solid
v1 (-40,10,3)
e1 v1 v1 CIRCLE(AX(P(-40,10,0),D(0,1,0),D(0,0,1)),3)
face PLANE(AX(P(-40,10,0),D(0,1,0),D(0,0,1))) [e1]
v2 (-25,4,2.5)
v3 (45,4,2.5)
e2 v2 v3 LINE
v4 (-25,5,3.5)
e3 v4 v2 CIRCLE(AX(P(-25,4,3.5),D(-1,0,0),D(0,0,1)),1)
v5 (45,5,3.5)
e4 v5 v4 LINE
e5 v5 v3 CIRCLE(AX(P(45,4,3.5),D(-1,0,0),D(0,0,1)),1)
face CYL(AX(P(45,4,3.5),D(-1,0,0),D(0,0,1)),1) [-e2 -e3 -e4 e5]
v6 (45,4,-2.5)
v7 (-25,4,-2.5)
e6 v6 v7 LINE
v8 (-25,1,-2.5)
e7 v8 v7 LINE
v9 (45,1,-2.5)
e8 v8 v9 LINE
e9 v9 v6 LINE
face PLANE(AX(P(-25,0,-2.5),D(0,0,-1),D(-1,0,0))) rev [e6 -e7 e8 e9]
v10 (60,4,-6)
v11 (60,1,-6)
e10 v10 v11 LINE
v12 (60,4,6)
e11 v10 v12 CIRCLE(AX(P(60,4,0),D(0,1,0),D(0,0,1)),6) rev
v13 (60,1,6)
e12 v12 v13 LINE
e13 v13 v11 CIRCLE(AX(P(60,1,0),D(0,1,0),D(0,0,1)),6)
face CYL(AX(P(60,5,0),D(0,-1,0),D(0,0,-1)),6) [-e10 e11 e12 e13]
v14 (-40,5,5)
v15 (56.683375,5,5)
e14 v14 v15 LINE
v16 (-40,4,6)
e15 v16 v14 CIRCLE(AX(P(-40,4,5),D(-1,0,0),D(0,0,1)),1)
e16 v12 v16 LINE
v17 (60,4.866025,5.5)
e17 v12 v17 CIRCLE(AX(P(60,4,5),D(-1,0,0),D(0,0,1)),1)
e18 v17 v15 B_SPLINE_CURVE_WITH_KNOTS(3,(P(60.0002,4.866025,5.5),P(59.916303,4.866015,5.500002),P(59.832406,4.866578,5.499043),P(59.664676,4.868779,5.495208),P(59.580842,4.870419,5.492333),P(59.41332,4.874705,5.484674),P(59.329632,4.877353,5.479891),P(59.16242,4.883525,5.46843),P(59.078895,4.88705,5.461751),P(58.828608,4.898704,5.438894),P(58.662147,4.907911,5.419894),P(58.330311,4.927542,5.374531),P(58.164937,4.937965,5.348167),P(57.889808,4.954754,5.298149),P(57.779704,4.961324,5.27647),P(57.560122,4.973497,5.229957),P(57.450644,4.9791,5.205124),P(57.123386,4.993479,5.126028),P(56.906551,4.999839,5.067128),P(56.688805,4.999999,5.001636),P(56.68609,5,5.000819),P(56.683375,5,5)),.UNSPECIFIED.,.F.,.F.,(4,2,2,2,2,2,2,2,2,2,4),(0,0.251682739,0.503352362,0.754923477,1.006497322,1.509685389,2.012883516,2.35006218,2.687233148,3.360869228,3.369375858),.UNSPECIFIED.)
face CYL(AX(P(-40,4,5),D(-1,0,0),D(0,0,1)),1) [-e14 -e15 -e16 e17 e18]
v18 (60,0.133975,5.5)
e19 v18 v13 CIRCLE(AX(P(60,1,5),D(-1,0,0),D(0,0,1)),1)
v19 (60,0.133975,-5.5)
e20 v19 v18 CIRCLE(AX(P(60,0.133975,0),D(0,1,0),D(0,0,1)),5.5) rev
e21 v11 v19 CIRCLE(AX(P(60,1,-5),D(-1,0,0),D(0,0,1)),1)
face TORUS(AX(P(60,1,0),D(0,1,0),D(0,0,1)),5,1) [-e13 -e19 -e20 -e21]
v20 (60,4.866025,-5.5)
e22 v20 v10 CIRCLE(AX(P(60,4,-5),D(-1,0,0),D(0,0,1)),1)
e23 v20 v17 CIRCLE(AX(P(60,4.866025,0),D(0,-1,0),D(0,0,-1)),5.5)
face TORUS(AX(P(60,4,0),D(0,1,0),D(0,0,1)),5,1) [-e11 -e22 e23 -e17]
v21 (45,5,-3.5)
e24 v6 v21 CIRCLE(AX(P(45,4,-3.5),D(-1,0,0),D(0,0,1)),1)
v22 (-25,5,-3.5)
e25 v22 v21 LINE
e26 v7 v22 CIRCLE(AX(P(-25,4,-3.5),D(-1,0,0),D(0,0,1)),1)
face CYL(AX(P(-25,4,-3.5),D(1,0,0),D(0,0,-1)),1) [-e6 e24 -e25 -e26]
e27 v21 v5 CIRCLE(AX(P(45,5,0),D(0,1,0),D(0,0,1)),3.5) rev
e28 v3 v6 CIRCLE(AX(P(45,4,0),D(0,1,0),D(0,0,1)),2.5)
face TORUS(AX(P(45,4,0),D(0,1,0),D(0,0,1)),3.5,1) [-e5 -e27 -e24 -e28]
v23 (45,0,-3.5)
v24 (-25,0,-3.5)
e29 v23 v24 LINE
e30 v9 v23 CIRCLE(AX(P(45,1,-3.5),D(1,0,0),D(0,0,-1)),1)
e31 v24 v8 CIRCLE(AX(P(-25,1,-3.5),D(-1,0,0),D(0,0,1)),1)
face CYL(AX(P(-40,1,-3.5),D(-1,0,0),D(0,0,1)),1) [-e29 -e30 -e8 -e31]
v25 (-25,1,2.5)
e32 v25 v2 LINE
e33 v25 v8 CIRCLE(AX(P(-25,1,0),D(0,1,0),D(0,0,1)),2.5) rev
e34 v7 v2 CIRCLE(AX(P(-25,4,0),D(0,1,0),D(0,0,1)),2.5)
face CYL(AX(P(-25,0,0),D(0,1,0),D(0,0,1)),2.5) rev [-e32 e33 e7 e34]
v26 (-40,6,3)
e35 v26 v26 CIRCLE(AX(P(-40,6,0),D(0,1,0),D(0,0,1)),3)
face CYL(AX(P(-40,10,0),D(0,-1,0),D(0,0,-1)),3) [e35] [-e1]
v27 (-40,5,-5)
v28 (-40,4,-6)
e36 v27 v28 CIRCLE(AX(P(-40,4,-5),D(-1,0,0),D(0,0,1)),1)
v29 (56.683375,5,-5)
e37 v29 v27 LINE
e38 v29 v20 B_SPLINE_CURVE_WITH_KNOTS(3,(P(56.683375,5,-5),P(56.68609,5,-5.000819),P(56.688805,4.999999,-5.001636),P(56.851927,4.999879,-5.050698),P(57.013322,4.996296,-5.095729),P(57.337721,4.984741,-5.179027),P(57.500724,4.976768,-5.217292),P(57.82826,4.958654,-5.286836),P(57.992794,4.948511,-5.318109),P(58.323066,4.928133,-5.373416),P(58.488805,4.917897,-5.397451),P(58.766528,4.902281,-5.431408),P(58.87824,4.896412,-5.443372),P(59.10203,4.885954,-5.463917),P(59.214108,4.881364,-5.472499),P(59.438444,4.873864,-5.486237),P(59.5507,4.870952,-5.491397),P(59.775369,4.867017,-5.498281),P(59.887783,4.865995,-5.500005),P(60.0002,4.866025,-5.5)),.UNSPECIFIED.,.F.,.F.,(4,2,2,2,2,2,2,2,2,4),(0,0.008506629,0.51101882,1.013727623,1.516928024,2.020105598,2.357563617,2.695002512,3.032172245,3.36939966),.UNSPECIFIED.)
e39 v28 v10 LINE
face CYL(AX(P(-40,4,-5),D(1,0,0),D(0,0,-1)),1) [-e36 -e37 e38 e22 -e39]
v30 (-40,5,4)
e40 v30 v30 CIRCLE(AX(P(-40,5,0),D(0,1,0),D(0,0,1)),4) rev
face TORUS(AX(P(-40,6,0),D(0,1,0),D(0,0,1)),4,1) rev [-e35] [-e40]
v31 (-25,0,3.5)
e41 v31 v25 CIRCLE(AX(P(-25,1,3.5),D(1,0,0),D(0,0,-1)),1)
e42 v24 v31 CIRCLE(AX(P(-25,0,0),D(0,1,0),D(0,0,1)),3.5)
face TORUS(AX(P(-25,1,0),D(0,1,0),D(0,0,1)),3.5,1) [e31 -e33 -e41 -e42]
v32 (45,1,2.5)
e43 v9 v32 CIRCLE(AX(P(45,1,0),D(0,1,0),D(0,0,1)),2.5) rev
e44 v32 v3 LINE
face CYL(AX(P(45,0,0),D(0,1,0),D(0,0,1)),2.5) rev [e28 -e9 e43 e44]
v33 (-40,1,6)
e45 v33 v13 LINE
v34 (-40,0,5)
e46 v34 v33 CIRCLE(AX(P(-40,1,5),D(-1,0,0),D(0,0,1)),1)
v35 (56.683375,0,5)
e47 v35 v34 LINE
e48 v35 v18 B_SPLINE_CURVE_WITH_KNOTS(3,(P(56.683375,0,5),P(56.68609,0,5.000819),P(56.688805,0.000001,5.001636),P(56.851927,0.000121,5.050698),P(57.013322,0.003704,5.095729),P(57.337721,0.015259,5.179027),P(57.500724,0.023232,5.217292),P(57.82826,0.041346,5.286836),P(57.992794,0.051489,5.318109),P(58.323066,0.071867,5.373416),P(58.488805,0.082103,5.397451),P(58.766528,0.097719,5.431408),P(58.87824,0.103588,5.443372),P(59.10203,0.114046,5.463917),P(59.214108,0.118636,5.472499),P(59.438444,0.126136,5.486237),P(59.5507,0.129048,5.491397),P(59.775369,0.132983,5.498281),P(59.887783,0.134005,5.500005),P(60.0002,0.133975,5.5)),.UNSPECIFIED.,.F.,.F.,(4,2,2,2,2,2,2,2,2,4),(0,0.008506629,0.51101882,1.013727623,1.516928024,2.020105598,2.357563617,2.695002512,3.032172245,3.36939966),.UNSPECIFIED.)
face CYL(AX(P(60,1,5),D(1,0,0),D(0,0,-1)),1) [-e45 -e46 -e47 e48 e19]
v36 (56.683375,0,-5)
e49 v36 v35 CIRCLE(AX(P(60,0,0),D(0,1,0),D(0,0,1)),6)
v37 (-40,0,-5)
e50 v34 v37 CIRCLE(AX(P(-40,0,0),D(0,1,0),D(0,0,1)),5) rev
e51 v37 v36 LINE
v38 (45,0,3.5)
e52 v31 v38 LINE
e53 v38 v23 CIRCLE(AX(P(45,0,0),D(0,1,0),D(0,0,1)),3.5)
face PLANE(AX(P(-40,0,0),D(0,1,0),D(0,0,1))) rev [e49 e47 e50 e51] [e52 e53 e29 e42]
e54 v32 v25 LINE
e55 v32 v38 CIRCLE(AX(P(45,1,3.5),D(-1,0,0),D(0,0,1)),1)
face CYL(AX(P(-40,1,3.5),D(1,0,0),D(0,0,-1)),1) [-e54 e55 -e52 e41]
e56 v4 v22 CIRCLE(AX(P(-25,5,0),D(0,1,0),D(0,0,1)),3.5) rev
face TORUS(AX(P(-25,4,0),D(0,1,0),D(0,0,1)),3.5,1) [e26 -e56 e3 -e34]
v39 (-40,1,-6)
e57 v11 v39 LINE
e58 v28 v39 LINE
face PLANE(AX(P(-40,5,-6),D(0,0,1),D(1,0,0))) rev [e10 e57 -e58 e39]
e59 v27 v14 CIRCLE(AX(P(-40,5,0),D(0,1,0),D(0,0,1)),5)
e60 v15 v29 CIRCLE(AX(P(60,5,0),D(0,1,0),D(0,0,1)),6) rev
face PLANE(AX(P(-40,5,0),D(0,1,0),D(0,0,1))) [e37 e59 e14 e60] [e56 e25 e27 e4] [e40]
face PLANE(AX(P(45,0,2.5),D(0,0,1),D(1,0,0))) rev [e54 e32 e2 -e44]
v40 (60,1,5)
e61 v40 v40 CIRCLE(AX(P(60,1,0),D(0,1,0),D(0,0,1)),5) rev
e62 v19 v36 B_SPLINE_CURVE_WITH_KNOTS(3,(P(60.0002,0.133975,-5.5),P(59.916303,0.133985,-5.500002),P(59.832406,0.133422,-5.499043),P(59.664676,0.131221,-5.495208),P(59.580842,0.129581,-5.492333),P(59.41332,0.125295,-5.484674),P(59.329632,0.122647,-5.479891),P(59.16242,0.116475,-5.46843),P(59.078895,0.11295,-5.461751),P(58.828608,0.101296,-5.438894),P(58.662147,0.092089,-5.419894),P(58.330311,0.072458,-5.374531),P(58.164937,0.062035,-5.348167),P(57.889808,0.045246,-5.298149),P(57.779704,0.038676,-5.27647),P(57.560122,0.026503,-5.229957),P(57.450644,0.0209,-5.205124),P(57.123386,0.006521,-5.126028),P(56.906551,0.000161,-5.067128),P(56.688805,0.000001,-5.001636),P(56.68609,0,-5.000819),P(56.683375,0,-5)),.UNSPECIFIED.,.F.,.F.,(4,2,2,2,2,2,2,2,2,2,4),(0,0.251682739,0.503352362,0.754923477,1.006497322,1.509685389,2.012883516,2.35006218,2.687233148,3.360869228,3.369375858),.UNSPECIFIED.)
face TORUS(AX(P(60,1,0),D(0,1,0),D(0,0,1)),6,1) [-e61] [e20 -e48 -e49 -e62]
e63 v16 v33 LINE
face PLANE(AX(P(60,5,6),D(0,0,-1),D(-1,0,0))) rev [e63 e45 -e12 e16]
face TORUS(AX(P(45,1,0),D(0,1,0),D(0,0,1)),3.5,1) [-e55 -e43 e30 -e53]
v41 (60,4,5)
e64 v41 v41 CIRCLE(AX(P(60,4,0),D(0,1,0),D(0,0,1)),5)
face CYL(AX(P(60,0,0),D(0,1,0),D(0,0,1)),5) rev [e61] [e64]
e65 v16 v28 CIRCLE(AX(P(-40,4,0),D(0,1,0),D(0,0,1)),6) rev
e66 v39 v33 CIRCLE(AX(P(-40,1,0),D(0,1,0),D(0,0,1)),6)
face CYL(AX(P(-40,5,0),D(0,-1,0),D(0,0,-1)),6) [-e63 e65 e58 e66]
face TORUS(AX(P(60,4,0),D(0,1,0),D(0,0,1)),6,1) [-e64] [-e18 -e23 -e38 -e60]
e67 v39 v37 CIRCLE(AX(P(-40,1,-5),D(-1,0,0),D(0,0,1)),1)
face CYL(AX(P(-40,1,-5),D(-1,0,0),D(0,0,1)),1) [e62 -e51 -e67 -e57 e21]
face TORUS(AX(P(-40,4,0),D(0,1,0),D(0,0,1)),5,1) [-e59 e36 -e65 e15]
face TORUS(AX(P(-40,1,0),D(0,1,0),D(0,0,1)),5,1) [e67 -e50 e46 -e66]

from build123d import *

# Parameters (mm, degrees)
SKETCH_1_R          = 6
EXTRUDE_1_DEPTH     = 5
EXTRUDE_1_2_DEPTH   = 5
SKETCH_3_W          = 100
SKETCH_3_H          = 12
EXTRUDE_3_DEPTH     = 5
SKETCH_5_R          = 5
CUT_EXTRUDE_2_DEPTH = 67.460514593
SKETCH_6_R          = 2.5
CUT_EXTRUDE_3_DEPTH = 67.460514593
SKETCH_7_W          = 70
SKETCH_7_H          = 5
CUT_EXTRUDE_4_DEPTH = 67.460514593
SKETCH_4_R          = 3
EXTRUDE_4_DEPTH     = 5
FILLET_1_R          = 1
FILLET_2_R          = 1


with BuildPart() as part:
    # 草图1 → 凸台-拉伸1 (new body)
    with BuildSketch(Plane(origin=(0, 0, 0), x_dir=(1, 0, 0), z_dir=(0, 1, 0))):
        with Locations(Location((-40, 0, 0), (0, 0, 270))):
            Circle(SKETCH_1_R)
    extrude(amount=EXTRUDE_1_DEPTH)



with BuildPart() as body_2:
    # 草图1 → Extrude 1 2 (new body)
    with BuildSketch(Plane(origin=(0, 0, 0), x_dir=(1, 0, 0), z_dir=(0, 1, 0))):
        with Locations(Location((60, 0, 0), (0, 0, 270))):
            Circle(SKETCH_1_R)
    extrude(amount=EXTRUDE_1_2_DEPTH)


with BuildPart() as part_1:
    add(part.part)

    add(body_2.part)  # 凸台-拉伸3 merges body 2
    # 草图3 → 凸台-拉伸3 (add)
    with BuildSketch(Plane(origin=(0, 0, 0), x_dir=(1, 0, 0), z_dir=(0, 1, 0))):
        with Locations((10, 0)):
            Rectangle(SKETCH_3_W, SKETCH_3_H)
    extrude(amount=EXTRUDE_3_DEPTH)

    # 草图5 → 切除-拉伸2 (cut, through all)
    with BuildSketch(Plane(origin=(0, 5, 0), x_dir=(1, 0, 0), z_dir=(0, 1, 0))):
        with Locations(Location((60, 0, 0), (0, 0, 270))):
            Circle(SKETCH_5_R)
    extrude(amount=-CUT_EXTRUDE_2_DEPTH, mode=Mode.SUBTRACT)

    # 草图6 → 切除-拉伸3 (cut, through all)
    with BuildSketch(Plane(origin=(0, 5, 0), x_dir=(1, 0, 0), z_dir=(0, 1, 0))):
        with Locations(Location((-25, 0, 0), (0, 0, 270))):
            Circle(SKETCH_6_R)
        with Locations(Location((45, 0, 0), (0, 0, 270))):
            Circle(SKETCH_6_R)
    extrude(amount=-CUT_EXTRUDE_3_DEPTH, mode=Mode.SUBTRACT)

    # 草图7 → 切除-拉伸4 (cut, through all)
    with BuildSketch(Plane(origin=(0, 5, 0), x_dir=(1, 0, 0), z_dir=(0, 1, 0))):
        with Locations((10, 0)):
            Rectangle(SKETCH_7_W, SKETCH_7_H)
    extrude(amount=-CUT_EXTRUDE_4_DEPTH, mode=Mode.SUBTRACT)

    # 草图4 → 凸台-拉伸4 (add)
    with BuildSketch(Plane(origin=(0, 5, 0), x_dir=(1, 0, 0), z_dir=(0, 1, 0))):
        with Locations(Location((-40, 0, 0), (0, 0, 270))):
            Circle(SKETCH_4_R)
    extrude(amount=EXTRUDE_4_DEPTH)

    # 圆角1
    fillet_1_edges = [part_1.edges().sort_by_distance(p)[0] for p in [
        (-40, 5, -3),
    ]]
    fillet(fillet_1_edges, radius=FILLET_1_R)

    # 圆角2
    # the kernel refuses this fillet: 1 mm, written as the material it takes off along each edge
    with BuildSketch(Plane(origin=(-40, 5, 0), x_dir=(0, 0, -1), z_dir=(1, 0, 0))) as fillet_2_piece_1:
        with BuildLine():
            CenterArc((6 - FILLET_2_R, -FILLET_2_R), FILLET_2_R, 0, 90)
            Line((6, -FILLET_2_R), (6, 0))
            Line((6, 0), (6 - FILLET_2_R, 0))
        make_face()
    revolve(axis=Axis((-40, 5, 0), (0, 1, 0)), revolution_arc=180, mode=Mode.SUBTRACT)
    with BuildSketch(Plane(origin=(-40, 0, -6), x_dir=(0, 1, 0), z_dir=(1, 0, 0)), Plane(origin=(-40, 5, -6), x_dir=(0, 0, 1), z_dir=(1, 0, 0)), Plane(origin=(60, 0, 6), x_dir=(0, 1, 0), z_dir=(-1, 0, 0)), Plane(origin=(60, 5, 6), x_dir=(0, 0, -1), z_dir=(-1, 0, 0))) as fillet_2_piece_2:
        with BuildLine():
            CenterArc((FILLET_2_R, FILLET_2_R), FILLET_2_R, 180, 90)
            Line((0, FILLET_2_R), (0, 0))
            Line((0, 0), (FILLET_2_R, 0))
        make_face()
    extrude(amount=100, mode=Mode.SUBTRACT)
    with BuildSketch(Plane(origin=(60, 5, 0), x_dir=(0, 0, 1), z_dir=(-1, 0, 0))) as fillet_2_piece_3:
        with BuildLine():
            CenterArc((6 - FILLET_2_R, -FILLET_2_R), FILLET_2_R, 0, 90)
            Line((6, -FILLET_2_R), (6, 0))
            Line((6, 0), (6 - FILLET_2_R, 0))
        make_face()
    revolve(axis=Axis((60, 5, 0), (0, 1, 0)), revolution_arc=180, mode=Mode.SUBTRACT)
    with BuildSketch(Plane(origin=(60, 5, 0), x_dir=(0, 0, 1), z_dir=(-1, 0, 0))) as fillet_2_piece_4:
        with BuildLine():
            CenterArc((5 + FILLET_2_R, -FILLET_2_R), FILLET_2_R, 90, 90)
            Line((5, -FILLET_2_R), (5, 0))
            Line((5, 0), (5 + FILLET_2_R, 0))
        make_face()
    revolve(axis=Axis((60, 5, 0), (0, 1, 0)), mode=Mode.SUBTRACT)
    with BuildSketch(Plane(origin=(-25, 5, 0), x_dir=(0, 0, -1), z_dir=(1, 0, 0))) as fillet_2_piece_5:
        with BuildLine():
            CenterArc((2.5 + FILLET_2_R, -FILLET_2_R), FILLET_2_R, 90, 90)
            Line((2.5, -FILLET_2_R), (2.5, 0))
            Line((2.5, 0), (2.5 + FILLET_2_R, 0))
        make_face()
    revolve(axis=Axis((-25, 5, 0), (0, 1, 0)), revolution_arc=180, mode=Mode.SUBTRACT)
    with BuildSketch(Plane(origin=(45, 5, 2.5), x_dir=(0, 0, 1), z_dir=(-1, 0, 0)), Plane(origin=(-25, 5, -2.5), x_dir=(0, 0, -1), z_dir=(1, 0, 0)), Plane(origin=(45, 0, 2.5), x_dir=(0, 1, 0), z_dir=(-1, 0, 0)), Plane(origin=(-25, 0, -2.5), x_dir=(0, 1, 0), z_dir=(1, 0, 0))) as fillet_2_piece_6:
        with BuildLine():
            CenterArc((FILLET_2_R, -FILLET_2_R), FILLET_2_R, 90, 90)
            Line((0, -FILLET_2_R), (0, 0))
            Line((0, 0), (FILLET_2_R, 0))
        make_face()
    extrude(amount=70, mode=Mode.SUBTRACT)
    with BuildSketch(Plane(origin=(45, 5, 0), x_dir=(0, 0, 1), z_dir=(-1, 0, 0))) as fillet_2_piece_7:
        with BuildLine():
            CenterArc((2.5 + FILLET_2_R, -FILLET_2_R), FILLET_2_R, 90, 90)
            Line((2.5, -FILLET_2_R), (2.5, 0))
            Line((2.5, 0), (2.5 + FILLET_2_R, 0))
        make_face()
    revolve(axis=Axis((45, 5, 0), (0, 1, 0)), revolution_arc=180, mode=Mode.SUBTRACT)
    with BuildSketch(Plane(origin=(-40, 0, 0), x_dir=(0, 0, -1), z_dir=(1, 0, 0))) as fillet_2_piece_8:
        with BuildLine():
            CenterArc((6 - FILLET_2_R, FILLET_2_R), FILLET_2_R, 270, 90)
            Line((6 - FILLET_2_R, 0), (6, 0))
            Line((6, 0), (6, FILLET_2_R))
        make_face()
    revolve(axis=Axis((-40, 0, 0), (0, 1, 0)), revolution_arc=180, mode=Mode.SUBTRACT)
    with BuildSketch(Plane(origin=(60, 0, 0), x_dir=(0, 0, 1), z_dir=(-1, 0, 0))) as fillet_2_piece_9:
        with BuildLine():
            CenterArc((6 - FILLET_2_R, FILLET_2_R), FILLET_2_R, 270, 90)
            Line((6 - FILLET_2_R, 0), (6, 0))
            Line((6, 0), (6, FILLET_2_R))
        make_face()
    revolve(axis=Axis((60, 0, 0), (0, 1, 0)), revolution_arc=180, mode=Mode.SUBTRACT)
    with BuildSketch(Plane(origin=(60, 0, 0), x_dir=(0, 0, 1), z_dir=(-1, 0, 0))) as fillet_2_piece_10:
        with BuildLine():
            CenterArc((5 + FILLET_2_R, FILLET_2_R), FILLET_2_R, 180, 90)
            Line((5 + FILLET_2_R, 0), (5, 0))
            Line((5, 0), (5, FILLET_2_R))
        make_face()
    revolve(axis=Axis((60, 0, 0), (0, 1, 0)), mode=Mode.SUBTRACT)
    with BuildSketch(Plane(origin=(-25, 0, 0), x_dir=(0, 0, -1), z_dir=(1, 0, 0))) as fillet_2_piece_11:
        with BuildLine():
            CenterArc((2.5 + FILLET_2_R, FILLET_2_R), FILLET_2_R, 180, 90)
            Line((2.5 + FILLET_2_R, 0), (2.5, 0))
            Line((2.5, 0), (2.5, FILLET_2_R))
        make_face()
    revolve(axis=Axis((-25, 0, 0), (0, 1, 0)), revolution_arc=180, mode=Mode.SUBTRACT)
    with BuildSketch(Plane(origin=(45, 0, 0), x_dir=(0, 0, 1), z_dir=(-1, 0, 0))) as fillet_2_piece_12:
        with BuildLine():
            CenterArc((2.5 + FILLET_2_R, FILLET_2_R), FILLET_2_R, 180, 90)
            Line((2.5 + FILLET_2_R, 0), (2.5, 0))
            Line((2.5, 0), (2.5, FILLET_2_R))
        make_face()
    revolve(axis=Axis((45, 0, 0), (0, 1, 0)), revolution_arc=180, mode=Mode.SUBTRACT)


solid = part_1.part
